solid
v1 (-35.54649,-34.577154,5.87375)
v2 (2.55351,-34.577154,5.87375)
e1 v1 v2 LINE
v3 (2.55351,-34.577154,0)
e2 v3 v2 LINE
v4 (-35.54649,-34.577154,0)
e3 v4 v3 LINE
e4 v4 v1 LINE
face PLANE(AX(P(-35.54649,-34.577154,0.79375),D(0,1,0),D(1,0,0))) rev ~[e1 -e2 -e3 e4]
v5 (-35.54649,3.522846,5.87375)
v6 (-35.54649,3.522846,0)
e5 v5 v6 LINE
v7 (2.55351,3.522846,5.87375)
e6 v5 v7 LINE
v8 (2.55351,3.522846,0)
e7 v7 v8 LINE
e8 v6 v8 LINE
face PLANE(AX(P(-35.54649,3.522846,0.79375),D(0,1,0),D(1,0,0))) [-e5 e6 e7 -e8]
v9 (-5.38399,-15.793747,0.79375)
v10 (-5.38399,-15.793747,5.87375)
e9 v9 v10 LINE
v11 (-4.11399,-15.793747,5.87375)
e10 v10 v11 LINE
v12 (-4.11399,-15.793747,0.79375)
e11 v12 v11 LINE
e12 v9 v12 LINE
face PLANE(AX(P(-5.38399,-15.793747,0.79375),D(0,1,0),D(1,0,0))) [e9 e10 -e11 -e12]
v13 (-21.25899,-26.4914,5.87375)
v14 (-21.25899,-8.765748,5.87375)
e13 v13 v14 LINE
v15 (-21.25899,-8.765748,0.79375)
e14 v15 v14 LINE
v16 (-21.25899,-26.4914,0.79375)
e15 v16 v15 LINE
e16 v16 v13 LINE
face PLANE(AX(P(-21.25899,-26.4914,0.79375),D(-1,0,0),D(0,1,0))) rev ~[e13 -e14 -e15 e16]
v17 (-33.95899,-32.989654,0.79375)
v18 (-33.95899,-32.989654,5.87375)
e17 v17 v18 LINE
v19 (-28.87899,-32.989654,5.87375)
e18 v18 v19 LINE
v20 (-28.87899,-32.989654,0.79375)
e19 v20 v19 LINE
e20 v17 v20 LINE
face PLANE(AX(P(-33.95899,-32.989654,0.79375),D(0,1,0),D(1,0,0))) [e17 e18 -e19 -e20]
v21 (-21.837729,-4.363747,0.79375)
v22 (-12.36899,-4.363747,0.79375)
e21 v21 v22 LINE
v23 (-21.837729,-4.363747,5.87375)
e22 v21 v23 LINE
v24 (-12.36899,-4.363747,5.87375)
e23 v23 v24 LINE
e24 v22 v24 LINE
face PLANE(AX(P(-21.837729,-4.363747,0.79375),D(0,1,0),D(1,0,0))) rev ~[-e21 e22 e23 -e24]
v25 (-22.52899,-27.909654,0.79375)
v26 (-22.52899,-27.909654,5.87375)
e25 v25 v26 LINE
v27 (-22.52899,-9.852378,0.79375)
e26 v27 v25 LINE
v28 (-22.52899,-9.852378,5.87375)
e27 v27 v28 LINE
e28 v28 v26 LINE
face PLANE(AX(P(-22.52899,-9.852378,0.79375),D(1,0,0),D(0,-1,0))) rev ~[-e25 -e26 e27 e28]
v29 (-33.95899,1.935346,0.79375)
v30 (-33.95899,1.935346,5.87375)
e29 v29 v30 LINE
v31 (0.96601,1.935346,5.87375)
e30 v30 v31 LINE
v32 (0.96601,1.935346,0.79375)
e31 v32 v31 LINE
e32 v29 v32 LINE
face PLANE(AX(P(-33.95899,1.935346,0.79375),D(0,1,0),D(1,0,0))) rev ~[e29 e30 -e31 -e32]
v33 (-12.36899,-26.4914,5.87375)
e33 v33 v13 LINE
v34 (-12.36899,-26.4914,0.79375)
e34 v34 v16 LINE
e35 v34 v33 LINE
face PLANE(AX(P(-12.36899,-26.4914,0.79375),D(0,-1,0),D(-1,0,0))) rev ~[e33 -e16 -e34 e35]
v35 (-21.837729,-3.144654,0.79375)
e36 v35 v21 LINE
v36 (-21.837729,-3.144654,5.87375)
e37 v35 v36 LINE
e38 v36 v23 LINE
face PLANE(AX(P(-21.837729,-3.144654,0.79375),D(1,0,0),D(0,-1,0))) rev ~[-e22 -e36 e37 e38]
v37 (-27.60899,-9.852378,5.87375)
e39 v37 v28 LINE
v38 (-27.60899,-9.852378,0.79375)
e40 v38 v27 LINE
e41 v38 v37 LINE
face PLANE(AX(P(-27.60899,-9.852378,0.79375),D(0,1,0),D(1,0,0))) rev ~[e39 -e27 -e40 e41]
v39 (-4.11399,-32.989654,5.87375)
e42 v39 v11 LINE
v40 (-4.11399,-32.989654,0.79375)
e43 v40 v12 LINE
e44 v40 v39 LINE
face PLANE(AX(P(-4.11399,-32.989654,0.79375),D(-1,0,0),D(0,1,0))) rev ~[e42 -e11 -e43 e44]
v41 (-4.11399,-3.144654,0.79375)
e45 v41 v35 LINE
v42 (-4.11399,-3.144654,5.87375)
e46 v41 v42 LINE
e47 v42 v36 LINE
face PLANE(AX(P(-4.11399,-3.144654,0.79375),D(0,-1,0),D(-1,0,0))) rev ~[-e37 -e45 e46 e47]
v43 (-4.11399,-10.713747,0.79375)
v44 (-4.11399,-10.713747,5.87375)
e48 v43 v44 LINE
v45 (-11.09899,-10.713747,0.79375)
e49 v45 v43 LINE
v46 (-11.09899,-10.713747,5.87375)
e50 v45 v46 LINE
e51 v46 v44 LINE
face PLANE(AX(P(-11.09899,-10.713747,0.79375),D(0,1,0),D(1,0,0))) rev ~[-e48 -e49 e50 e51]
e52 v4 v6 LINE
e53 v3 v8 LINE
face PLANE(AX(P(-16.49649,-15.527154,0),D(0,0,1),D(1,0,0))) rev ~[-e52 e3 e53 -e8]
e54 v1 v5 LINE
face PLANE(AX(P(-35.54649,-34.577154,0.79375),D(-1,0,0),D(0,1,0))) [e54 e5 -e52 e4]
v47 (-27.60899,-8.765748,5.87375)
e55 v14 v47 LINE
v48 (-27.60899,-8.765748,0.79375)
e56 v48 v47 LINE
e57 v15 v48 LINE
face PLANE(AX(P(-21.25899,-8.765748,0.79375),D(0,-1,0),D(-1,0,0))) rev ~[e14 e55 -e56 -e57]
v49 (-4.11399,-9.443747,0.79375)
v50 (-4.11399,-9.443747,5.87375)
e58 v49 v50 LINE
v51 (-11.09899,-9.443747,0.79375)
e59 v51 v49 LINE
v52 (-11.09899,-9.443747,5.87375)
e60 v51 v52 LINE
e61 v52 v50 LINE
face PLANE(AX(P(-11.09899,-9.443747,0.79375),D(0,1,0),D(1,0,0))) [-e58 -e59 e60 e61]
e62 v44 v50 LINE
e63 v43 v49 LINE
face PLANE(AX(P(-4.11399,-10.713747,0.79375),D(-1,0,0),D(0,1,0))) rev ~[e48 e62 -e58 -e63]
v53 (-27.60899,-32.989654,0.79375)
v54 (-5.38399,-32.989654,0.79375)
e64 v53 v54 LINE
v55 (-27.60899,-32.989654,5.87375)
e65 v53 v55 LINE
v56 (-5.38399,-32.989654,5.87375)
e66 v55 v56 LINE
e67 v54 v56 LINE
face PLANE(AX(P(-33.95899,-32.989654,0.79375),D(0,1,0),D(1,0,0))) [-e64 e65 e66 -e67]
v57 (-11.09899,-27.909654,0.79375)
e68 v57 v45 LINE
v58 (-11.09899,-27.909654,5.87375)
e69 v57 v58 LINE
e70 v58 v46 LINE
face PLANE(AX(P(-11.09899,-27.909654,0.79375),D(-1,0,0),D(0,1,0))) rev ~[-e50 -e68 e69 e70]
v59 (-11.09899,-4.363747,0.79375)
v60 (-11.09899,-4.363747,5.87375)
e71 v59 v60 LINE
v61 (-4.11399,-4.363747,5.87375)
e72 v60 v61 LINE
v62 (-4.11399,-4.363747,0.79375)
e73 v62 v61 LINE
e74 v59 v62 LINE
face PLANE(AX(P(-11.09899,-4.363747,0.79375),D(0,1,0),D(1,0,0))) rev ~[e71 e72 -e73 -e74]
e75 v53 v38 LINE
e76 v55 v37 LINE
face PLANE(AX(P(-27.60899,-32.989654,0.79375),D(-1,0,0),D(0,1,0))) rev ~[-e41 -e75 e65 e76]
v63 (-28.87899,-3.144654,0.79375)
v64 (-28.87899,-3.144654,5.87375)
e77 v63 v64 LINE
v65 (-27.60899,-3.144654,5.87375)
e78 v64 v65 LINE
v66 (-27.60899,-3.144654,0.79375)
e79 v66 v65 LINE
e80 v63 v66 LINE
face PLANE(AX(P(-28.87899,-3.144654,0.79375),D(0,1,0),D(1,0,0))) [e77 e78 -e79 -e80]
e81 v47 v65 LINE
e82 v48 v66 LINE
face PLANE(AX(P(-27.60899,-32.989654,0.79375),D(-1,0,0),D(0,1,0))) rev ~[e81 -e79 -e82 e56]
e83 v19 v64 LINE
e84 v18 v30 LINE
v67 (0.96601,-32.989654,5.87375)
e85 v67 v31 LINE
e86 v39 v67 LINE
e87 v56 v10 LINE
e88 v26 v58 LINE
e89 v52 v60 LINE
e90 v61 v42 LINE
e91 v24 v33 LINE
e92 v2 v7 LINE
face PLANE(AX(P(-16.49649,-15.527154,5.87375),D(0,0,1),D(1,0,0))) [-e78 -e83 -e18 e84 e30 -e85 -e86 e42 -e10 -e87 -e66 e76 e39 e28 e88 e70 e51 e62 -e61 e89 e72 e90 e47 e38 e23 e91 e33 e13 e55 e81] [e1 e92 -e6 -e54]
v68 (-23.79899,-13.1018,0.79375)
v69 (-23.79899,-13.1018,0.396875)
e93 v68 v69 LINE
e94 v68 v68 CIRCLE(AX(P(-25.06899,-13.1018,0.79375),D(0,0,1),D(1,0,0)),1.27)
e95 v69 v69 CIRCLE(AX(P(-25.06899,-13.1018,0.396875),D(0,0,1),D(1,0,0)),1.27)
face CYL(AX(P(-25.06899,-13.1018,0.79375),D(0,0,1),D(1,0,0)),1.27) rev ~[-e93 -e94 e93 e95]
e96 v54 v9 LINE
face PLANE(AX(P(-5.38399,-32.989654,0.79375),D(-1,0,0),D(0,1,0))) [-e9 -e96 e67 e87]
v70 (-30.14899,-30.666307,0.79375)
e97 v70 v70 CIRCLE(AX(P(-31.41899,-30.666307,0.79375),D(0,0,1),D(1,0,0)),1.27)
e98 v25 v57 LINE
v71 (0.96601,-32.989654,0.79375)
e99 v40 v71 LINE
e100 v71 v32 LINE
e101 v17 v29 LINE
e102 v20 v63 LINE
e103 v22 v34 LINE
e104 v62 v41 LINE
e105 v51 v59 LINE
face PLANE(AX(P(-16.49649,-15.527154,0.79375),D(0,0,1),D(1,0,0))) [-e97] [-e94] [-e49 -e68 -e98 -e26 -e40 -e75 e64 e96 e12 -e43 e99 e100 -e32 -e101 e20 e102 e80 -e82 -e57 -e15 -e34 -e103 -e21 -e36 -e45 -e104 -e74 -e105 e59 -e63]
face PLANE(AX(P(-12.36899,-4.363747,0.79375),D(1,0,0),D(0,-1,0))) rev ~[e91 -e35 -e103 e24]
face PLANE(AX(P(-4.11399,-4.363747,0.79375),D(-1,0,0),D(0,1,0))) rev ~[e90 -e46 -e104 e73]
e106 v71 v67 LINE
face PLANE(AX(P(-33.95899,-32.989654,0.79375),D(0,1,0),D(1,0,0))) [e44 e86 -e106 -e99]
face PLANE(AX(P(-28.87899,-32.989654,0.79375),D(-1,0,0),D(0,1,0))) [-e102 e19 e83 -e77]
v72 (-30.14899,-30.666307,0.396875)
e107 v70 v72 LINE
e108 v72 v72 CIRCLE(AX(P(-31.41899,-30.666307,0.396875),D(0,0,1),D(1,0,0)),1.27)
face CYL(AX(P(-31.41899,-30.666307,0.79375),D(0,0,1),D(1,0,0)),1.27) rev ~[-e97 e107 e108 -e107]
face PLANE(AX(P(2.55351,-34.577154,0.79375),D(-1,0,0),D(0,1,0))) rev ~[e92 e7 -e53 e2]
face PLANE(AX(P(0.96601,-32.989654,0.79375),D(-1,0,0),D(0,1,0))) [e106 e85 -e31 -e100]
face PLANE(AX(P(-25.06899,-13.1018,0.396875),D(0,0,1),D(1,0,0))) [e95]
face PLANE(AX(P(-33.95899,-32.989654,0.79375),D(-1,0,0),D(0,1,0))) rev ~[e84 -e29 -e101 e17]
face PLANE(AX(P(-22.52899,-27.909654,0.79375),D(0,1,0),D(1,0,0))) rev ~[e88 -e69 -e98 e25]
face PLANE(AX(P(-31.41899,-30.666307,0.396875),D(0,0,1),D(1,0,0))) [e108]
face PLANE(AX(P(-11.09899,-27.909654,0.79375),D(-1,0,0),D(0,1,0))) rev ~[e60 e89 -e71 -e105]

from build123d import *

# Parameters (mm, degrees)
F0_W      = 38.1
F0_H      = 38.1
F1_DEPTH  = 0.79375
F2_W      = 38.1
F2_H      = 38.1
F2_W_2    = 34.925
F2_H_2    = 34.925
F3_DEPTH  = 5.08
F4_W      = 1.27
F4_H      = 29.845
F5_DEPTH  = 5.08
F6_R      = 1.27
F7_DEPTH  = 0.396875
F9_DEPTH  = 5.08
F8_W      = 1.27
F8_H      = 17.1959060269
F10_DEPTH = 5.08
F8_R      = 1.27
F11_DEPTH = 0.396875
F8_W_2    = 6.985
F8_H_2    = 1.27
F12_DEPTH = 5.08


# Not quite as in the source:
# - a feature names something its author has since deleted; it is built from what else it names


with BuildPart() as f1:
    # F0 (on Top) → F1 (new body)
    with BuildSketch(Plane.XY):
        with Locations((-16.4964904517, -15.5271535208)):
            Rectangle(F0_W, F0_H)
    extrude(amount=F1_DEPTH)

    # F2 (on face) → F3 (join)
    with BuildSketch(Plane.XY.offset(0.79375)):
        with Locations((-16.4964904517, -15.5271535208)):
            Rectangle(F2_W, F2_H)
        with Locations((-16.4964904517, -15.5271535208)):
            Rectangle(F2_W_2, F2_H_2, mode=Mode.SUBTRACT)
    extrude(amount=F3_DEPTH)

    # F4 (on face) → F5 (join)
    with BuildSketch(Plane.XY.offset(0.79375)):
        with Locations((-28.2439904517, -18.0671535208)):
            Rectangle(F4_W, F4_H)
    extrude(amount=F5_DEPTH)

    # F6 (on face) → F7 (cut)
    with BuildSketch(Plane.XY.offset(0.79375)):
        with Locations((-31.4189904517, -30.6663066149)):
            Circle(F6_R)
    extrude(amount=-F7_DEPTH, mode=Mode.SUBTRACT)

    # F8 (on face) → F9 (join)
    with BuildSketch(Plane.XY.offset(0.79375)):
        Polygon((-4.1139904517, -3.1446535208), (-21.8377289305, -3.1446535208), (-21.8377289305, -4.3637474939), (-12.3689904517, -4.3637474939), (-12.3689904517, -26.4913998544), (-21.2589904517, -26.4913998544), (-21.2589904517, -8.7657477707), (-22.5289904517, -8.7657477707), (-27.6089904517, -8.7657477707), (-27.6089904517, -9.8523776978), (-22.5289904517, -9.8523776978), (-22.5289904517, -27.9096535208), (-11.0989904517, -27.9096535208), (-11.0989904517, -10.7137474939), (-11.0989904517, -9.4437474939), (-11.0989904517, -4.3637474939), (-4.1139904517, -4.3637474939), align=None)
    extrude(amount=F9_DEPTH)

    # F8 (on face) → F10 (join)
    with BuildSketch(Plane.XY.offset(0.79375)):
        with Locations((-4.7489904517, -24.3917005073)):
            Rectangle(F8_W, F8_H)
    extrude(amount=F10_DEPTH)

    # F8 (on face) → F11 (cut)
    with BuildSketch(Plane.XY.offset(0.79375)):
        with Locations((-25.0689904517, -13.1018003449)):
            Circle(F8_R)
    extrude(amount=-F11_DEPTH, mode=Mode.SUBTRACT)

    # F8 (on face) → F12 (join)
    with BuildSketch(Plane.XY.offset(0.79375)):
        with Locations((-7.6064904517, -10.0787474939)):
            Rectangle(F8_W_2, F8_H_2)
    extrude(amount=F12_DEPTH)


solid = f1.part
